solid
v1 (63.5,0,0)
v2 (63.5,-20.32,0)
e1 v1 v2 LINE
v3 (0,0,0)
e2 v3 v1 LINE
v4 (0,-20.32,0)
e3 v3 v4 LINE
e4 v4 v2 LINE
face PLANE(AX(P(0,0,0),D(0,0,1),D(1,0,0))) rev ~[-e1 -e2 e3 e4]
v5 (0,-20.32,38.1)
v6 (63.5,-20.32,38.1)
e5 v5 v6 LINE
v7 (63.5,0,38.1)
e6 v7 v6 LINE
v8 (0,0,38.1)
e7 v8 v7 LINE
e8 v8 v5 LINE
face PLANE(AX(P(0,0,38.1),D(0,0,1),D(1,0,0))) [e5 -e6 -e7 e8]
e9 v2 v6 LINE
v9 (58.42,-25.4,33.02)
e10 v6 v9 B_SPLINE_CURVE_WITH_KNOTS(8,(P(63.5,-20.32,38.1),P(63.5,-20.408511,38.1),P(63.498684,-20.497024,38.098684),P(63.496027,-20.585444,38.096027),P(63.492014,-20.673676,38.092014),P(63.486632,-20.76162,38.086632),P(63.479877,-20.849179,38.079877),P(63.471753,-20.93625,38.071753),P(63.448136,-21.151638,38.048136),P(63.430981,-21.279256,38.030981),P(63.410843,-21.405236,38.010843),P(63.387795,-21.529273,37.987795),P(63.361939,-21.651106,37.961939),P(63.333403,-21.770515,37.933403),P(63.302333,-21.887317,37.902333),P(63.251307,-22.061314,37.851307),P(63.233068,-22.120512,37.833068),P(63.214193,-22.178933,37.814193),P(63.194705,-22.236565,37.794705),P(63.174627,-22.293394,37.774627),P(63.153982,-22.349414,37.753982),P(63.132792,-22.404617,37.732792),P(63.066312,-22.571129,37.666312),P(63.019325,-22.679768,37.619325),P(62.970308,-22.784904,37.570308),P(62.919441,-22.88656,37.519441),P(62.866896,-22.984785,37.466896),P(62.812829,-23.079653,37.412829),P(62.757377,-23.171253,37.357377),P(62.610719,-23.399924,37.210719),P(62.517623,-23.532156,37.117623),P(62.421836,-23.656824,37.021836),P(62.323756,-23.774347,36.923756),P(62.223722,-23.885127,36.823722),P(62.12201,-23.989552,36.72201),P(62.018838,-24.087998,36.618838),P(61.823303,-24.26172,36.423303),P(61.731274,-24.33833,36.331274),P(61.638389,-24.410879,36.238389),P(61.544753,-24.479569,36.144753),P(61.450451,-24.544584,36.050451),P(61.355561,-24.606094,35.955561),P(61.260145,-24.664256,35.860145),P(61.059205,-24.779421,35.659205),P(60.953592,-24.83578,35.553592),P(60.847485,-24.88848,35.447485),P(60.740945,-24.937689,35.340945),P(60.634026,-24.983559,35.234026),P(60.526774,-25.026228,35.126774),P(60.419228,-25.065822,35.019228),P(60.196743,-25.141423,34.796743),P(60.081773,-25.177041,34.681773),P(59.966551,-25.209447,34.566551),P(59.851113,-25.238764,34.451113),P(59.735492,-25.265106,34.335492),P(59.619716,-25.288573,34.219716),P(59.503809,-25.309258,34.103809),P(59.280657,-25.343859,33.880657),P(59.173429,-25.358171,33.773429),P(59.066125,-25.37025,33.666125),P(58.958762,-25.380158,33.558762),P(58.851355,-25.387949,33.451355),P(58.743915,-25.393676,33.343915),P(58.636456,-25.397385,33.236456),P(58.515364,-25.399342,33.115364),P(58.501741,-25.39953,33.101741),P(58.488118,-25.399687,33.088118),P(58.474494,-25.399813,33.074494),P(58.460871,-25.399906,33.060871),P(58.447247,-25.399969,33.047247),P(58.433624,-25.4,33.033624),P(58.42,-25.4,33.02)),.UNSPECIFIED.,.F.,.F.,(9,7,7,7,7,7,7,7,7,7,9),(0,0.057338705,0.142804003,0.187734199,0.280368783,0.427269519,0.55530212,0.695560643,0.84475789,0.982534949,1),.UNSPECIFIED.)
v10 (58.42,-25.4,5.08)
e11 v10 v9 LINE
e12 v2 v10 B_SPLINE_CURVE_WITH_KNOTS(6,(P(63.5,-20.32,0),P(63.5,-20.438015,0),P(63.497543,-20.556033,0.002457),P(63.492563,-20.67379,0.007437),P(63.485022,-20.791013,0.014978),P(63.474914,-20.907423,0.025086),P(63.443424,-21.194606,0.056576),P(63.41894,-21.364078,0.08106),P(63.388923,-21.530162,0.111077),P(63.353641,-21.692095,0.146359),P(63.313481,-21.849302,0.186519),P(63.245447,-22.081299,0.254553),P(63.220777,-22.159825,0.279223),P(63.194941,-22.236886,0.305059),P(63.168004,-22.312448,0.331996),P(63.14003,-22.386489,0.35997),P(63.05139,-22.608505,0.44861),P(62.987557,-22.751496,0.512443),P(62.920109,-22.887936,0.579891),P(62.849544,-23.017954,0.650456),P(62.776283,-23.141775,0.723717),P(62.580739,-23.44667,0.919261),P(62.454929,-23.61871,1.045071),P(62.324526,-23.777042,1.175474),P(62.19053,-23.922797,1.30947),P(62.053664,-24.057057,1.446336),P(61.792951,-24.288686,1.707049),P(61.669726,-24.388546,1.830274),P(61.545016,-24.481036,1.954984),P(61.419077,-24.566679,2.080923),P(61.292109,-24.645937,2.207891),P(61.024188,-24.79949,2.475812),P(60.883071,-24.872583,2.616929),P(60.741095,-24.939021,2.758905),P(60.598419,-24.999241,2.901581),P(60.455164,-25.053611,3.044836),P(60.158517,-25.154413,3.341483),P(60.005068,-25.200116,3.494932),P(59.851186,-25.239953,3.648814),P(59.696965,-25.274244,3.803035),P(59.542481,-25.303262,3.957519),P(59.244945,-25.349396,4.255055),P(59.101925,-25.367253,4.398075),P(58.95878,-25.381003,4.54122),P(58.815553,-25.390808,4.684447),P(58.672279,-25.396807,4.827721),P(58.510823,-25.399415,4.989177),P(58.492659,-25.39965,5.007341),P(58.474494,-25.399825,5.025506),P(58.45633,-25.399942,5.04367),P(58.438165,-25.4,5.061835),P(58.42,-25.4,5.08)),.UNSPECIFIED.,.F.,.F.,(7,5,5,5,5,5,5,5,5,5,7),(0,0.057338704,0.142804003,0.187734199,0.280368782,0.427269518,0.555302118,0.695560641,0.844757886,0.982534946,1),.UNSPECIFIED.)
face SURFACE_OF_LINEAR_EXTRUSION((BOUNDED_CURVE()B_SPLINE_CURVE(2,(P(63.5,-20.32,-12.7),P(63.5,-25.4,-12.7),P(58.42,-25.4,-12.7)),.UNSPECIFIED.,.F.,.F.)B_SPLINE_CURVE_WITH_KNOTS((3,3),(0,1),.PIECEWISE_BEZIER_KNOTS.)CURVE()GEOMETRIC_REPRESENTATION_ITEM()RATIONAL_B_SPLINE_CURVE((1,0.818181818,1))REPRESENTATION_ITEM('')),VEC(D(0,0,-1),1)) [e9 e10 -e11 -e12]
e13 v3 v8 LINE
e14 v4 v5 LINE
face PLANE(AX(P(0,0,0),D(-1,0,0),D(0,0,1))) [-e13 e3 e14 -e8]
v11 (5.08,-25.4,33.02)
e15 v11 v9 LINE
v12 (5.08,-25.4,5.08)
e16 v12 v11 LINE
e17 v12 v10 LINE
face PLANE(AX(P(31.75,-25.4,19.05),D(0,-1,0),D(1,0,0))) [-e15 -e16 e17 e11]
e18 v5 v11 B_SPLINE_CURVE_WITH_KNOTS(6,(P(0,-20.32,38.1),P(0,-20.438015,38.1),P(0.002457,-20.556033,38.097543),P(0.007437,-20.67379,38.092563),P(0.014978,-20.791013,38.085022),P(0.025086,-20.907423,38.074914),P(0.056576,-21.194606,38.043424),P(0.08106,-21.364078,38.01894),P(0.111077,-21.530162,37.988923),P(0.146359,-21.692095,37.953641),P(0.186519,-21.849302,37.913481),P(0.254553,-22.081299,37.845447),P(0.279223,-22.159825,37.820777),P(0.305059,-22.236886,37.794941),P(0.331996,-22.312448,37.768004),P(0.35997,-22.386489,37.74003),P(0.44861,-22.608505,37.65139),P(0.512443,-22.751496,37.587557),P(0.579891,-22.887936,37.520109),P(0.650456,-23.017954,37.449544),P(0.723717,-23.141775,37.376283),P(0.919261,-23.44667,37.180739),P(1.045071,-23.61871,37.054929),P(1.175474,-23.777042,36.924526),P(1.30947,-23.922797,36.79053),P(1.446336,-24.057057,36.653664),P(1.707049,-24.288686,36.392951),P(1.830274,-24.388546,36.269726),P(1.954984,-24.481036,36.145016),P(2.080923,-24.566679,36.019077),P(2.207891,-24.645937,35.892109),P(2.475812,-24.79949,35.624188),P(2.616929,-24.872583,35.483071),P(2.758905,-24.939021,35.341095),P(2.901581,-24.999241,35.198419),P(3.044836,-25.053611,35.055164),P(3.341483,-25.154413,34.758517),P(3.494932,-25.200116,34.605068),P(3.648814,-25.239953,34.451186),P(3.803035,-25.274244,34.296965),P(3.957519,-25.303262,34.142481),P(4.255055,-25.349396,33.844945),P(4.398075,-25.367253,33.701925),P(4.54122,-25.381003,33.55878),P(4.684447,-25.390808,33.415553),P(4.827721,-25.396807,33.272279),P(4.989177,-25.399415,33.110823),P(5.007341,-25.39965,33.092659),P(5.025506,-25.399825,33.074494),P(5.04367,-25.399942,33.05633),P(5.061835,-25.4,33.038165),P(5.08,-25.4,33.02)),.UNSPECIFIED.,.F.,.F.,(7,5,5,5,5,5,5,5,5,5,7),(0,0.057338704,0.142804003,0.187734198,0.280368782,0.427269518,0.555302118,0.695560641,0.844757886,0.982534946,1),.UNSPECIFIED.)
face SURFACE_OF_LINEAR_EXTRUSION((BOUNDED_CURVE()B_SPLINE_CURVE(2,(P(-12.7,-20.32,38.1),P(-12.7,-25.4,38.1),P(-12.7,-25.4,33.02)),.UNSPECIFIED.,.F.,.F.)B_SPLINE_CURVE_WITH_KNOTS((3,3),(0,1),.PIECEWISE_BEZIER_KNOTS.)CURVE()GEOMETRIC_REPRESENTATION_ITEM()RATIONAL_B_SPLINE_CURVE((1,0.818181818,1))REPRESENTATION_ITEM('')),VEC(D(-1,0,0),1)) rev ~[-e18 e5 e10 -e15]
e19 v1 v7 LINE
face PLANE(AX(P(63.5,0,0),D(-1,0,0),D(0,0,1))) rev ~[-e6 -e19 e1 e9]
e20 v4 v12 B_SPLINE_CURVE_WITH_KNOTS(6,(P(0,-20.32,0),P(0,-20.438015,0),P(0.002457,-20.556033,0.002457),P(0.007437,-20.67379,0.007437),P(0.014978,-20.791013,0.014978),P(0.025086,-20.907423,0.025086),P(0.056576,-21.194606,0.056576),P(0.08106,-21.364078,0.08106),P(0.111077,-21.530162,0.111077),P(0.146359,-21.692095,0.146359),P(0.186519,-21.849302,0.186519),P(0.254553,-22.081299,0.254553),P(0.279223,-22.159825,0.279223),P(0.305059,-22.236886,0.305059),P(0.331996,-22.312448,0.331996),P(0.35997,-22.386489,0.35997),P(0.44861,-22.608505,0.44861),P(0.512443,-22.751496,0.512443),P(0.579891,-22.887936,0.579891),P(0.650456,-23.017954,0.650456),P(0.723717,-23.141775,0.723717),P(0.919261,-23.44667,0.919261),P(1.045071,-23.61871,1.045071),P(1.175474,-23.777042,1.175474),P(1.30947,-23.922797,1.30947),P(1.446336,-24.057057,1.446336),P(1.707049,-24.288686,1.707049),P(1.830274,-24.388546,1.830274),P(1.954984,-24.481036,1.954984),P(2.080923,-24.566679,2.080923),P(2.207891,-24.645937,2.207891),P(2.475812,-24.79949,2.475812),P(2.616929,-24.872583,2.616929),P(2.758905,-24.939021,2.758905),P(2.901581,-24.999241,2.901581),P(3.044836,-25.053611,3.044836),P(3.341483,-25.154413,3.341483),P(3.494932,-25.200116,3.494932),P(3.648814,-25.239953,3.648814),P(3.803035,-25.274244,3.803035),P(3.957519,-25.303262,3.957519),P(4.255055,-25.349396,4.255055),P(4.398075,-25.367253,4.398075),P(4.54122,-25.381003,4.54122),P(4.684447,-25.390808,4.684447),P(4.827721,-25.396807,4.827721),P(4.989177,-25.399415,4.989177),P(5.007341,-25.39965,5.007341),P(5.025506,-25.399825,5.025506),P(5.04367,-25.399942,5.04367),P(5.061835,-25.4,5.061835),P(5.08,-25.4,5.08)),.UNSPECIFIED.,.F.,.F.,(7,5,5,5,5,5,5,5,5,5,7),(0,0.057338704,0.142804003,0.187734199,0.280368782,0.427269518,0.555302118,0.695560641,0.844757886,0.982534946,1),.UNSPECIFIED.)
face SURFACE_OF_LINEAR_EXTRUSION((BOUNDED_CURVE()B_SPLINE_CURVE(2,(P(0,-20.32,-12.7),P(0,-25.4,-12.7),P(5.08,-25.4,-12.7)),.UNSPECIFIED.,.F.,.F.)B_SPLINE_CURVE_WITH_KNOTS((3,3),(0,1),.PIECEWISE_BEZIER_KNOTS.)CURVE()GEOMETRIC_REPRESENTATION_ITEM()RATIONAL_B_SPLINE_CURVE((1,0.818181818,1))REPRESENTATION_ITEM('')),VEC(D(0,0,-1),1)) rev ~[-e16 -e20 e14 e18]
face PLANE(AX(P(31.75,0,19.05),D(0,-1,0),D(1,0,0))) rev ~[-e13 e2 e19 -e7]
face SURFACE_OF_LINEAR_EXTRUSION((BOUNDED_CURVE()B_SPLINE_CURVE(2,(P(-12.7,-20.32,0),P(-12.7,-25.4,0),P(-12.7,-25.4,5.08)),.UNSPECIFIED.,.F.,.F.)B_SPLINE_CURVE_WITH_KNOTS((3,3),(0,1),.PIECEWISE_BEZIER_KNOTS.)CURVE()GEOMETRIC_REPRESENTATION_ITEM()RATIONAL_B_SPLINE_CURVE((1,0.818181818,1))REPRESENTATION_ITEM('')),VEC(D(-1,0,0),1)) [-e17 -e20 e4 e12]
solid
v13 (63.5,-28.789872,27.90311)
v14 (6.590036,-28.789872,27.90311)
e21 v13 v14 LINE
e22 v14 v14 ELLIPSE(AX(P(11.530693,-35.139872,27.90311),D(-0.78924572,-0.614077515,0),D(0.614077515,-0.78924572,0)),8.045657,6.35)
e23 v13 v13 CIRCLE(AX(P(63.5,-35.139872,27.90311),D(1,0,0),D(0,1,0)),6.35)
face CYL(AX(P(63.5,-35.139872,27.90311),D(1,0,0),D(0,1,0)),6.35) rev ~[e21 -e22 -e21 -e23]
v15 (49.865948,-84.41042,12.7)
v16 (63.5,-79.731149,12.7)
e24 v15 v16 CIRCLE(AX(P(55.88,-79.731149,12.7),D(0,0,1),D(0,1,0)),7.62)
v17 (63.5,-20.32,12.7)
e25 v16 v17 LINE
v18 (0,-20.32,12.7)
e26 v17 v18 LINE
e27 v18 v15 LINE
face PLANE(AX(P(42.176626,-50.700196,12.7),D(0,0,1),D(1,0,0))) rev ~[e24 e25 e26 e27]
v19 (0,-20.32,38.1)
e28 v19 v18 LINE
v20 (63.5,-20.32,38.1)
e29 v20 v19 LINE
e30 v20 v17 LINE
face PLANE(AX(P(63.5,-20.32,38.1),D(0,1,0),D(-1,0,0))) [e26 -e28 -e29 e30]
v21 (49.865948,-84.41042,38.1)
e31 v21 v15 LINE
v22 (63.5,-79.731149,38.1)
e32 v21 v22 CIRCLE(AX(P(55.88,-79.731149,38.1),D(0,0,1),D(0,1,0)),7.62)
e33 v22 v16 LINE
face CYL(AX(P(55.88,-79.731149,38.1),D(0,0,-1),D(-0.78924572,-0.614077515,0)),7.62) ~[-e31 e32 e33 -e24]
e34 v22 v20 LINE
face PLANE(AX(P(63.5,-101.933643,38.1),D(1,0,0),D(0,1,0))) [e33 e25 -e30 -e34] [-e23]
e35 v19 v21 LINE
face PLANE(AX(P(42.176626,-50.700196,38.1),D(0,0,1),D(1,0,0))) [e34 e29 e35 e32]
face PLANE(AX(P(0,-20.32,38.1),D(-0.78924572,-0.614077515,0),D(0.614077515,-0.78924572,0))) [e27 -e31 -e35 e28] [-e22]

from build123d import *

# Parameters (mm, degrees)
F0_W        = 63.5
F0_H        = 38.1
F1_DEPTH    = 25.4
F2_T1_DEPTH = 63.5
F2_T3_DEPTH = 88.9
F4_DEPTH    = 25.399999693
F5_R        = 6.35
F6_DEPTH    = 56.9109635576
F7_R        = 7.62


# Not quite as in the source:
# - a fillet or chamfer that OpenCascade refuses, or shapes differently, is made with other operations: its cross-section is extruded or revolved along the edge and cut away or added


with BuildPart() as f1:
    # F0 (on Front) → F1 (new body)
    with BuildSketch(Plane.XZ):
        with Locations((31.75, 19.05)):
            Rectangle(F0_W, F0_H)
    extrude(amount=F1_DEPTH)

    # F2: fillet of radius 5.08 on 4 edges, made by hand

    # F2_s2 → F2_t1 (cut)
    with BuildSketch(Plane.XY.offset(-12.7)):
        with BuildLine():
            add(Edge.make_bspline(
                [(0, -20.32), (0, -25.4), (5.08, -25.4)],
                knots=[0, 0, 0, 1, 1, 1], degree=2, weights=[1, 0.8181818182, 1]))
            Line((5.08, -25.4), (0, -25.4))
            Line((0, -25.4), (0, -20.32))
        make_face()
        with BuildLine():
            add(Edge.make_bspline(
                [(63.5, -20.32), (63.5, -25.4), (58.42, -25.4)],
                knots=[0, 0, 0, 1, 1, 1], degree=2, weights=[1, 0.8181818182, 1]))
            Line((58.42, -25.4), (63.5, -25.4))
            Line((63.5, -25.4), (63.5, -20.32))
        make_face()
    extrude(amount=F2_T1_DEPTH, mode=Mode.SUBTRACT)

    # F2_s4 → F2_t3 (cut)
    with BuildSketch(Plane.YZ.offset(-12.7)):
        with BuildLine():
            add(Edge.make_bspline(
                [(-20.32, 0), (-25.4, 0), (-25.4, 5.08)],
                knots=[0, 0, 0, 1, 1, 1], degree=2, weights=[1, 0.8181818182, 1]))
            Line((-25.4, 5.08), (-25.4, 0))
            Line((-25.4, 0), (-20.32, 0))
        make_face()
        with BuildLine():
            add(Edge.make_bspline(
                [(-20.32, 38.1), (-25.4, 38.1), (-25.4, 33.02)],
                knots=[0, 0, 0, 1, 1, 1], degree=2, weights=[1, 0.8181818182, 1]))
            Line((-25.4, 33.02), (-25.4, 38.1))
            Line((-25.4, 38.1), (-20.32, 38.1))
        make_face()
    extrude(amount=F2_T3_DEPTH, mode=Mode.SUBTRACT)


with BuildPart() as f4:
    # F3 (on face) → F4 (new body)
    with BuildSketch(Plane.XY.offset(38.1)):
        Polygon((0, -20.32), (63.5, -101.9336432219), (63.5, -20.32), align=None)
    extrude(amount=-F4_DEPTH)

    # F5 (on face) → F6 (cut, through all)
    with BuildSketch(Plane.YZ.offset(63.5)):
        with Locations((-35.1398721737, 27.9031097638)):
            Circle(F5_R)
    extrude(amount=-F6_DEPTH, mode=Mode.SUBTRACT)

    # F7
    f7_edges = [f4.edges().sort_by_distance(p)[0] for p in [
        (63.5, -101.933643, 25.4),
    ]]
    fillet(f7_edges, radius=F7_R)


solid = Compound([f1.part, f4.part])
